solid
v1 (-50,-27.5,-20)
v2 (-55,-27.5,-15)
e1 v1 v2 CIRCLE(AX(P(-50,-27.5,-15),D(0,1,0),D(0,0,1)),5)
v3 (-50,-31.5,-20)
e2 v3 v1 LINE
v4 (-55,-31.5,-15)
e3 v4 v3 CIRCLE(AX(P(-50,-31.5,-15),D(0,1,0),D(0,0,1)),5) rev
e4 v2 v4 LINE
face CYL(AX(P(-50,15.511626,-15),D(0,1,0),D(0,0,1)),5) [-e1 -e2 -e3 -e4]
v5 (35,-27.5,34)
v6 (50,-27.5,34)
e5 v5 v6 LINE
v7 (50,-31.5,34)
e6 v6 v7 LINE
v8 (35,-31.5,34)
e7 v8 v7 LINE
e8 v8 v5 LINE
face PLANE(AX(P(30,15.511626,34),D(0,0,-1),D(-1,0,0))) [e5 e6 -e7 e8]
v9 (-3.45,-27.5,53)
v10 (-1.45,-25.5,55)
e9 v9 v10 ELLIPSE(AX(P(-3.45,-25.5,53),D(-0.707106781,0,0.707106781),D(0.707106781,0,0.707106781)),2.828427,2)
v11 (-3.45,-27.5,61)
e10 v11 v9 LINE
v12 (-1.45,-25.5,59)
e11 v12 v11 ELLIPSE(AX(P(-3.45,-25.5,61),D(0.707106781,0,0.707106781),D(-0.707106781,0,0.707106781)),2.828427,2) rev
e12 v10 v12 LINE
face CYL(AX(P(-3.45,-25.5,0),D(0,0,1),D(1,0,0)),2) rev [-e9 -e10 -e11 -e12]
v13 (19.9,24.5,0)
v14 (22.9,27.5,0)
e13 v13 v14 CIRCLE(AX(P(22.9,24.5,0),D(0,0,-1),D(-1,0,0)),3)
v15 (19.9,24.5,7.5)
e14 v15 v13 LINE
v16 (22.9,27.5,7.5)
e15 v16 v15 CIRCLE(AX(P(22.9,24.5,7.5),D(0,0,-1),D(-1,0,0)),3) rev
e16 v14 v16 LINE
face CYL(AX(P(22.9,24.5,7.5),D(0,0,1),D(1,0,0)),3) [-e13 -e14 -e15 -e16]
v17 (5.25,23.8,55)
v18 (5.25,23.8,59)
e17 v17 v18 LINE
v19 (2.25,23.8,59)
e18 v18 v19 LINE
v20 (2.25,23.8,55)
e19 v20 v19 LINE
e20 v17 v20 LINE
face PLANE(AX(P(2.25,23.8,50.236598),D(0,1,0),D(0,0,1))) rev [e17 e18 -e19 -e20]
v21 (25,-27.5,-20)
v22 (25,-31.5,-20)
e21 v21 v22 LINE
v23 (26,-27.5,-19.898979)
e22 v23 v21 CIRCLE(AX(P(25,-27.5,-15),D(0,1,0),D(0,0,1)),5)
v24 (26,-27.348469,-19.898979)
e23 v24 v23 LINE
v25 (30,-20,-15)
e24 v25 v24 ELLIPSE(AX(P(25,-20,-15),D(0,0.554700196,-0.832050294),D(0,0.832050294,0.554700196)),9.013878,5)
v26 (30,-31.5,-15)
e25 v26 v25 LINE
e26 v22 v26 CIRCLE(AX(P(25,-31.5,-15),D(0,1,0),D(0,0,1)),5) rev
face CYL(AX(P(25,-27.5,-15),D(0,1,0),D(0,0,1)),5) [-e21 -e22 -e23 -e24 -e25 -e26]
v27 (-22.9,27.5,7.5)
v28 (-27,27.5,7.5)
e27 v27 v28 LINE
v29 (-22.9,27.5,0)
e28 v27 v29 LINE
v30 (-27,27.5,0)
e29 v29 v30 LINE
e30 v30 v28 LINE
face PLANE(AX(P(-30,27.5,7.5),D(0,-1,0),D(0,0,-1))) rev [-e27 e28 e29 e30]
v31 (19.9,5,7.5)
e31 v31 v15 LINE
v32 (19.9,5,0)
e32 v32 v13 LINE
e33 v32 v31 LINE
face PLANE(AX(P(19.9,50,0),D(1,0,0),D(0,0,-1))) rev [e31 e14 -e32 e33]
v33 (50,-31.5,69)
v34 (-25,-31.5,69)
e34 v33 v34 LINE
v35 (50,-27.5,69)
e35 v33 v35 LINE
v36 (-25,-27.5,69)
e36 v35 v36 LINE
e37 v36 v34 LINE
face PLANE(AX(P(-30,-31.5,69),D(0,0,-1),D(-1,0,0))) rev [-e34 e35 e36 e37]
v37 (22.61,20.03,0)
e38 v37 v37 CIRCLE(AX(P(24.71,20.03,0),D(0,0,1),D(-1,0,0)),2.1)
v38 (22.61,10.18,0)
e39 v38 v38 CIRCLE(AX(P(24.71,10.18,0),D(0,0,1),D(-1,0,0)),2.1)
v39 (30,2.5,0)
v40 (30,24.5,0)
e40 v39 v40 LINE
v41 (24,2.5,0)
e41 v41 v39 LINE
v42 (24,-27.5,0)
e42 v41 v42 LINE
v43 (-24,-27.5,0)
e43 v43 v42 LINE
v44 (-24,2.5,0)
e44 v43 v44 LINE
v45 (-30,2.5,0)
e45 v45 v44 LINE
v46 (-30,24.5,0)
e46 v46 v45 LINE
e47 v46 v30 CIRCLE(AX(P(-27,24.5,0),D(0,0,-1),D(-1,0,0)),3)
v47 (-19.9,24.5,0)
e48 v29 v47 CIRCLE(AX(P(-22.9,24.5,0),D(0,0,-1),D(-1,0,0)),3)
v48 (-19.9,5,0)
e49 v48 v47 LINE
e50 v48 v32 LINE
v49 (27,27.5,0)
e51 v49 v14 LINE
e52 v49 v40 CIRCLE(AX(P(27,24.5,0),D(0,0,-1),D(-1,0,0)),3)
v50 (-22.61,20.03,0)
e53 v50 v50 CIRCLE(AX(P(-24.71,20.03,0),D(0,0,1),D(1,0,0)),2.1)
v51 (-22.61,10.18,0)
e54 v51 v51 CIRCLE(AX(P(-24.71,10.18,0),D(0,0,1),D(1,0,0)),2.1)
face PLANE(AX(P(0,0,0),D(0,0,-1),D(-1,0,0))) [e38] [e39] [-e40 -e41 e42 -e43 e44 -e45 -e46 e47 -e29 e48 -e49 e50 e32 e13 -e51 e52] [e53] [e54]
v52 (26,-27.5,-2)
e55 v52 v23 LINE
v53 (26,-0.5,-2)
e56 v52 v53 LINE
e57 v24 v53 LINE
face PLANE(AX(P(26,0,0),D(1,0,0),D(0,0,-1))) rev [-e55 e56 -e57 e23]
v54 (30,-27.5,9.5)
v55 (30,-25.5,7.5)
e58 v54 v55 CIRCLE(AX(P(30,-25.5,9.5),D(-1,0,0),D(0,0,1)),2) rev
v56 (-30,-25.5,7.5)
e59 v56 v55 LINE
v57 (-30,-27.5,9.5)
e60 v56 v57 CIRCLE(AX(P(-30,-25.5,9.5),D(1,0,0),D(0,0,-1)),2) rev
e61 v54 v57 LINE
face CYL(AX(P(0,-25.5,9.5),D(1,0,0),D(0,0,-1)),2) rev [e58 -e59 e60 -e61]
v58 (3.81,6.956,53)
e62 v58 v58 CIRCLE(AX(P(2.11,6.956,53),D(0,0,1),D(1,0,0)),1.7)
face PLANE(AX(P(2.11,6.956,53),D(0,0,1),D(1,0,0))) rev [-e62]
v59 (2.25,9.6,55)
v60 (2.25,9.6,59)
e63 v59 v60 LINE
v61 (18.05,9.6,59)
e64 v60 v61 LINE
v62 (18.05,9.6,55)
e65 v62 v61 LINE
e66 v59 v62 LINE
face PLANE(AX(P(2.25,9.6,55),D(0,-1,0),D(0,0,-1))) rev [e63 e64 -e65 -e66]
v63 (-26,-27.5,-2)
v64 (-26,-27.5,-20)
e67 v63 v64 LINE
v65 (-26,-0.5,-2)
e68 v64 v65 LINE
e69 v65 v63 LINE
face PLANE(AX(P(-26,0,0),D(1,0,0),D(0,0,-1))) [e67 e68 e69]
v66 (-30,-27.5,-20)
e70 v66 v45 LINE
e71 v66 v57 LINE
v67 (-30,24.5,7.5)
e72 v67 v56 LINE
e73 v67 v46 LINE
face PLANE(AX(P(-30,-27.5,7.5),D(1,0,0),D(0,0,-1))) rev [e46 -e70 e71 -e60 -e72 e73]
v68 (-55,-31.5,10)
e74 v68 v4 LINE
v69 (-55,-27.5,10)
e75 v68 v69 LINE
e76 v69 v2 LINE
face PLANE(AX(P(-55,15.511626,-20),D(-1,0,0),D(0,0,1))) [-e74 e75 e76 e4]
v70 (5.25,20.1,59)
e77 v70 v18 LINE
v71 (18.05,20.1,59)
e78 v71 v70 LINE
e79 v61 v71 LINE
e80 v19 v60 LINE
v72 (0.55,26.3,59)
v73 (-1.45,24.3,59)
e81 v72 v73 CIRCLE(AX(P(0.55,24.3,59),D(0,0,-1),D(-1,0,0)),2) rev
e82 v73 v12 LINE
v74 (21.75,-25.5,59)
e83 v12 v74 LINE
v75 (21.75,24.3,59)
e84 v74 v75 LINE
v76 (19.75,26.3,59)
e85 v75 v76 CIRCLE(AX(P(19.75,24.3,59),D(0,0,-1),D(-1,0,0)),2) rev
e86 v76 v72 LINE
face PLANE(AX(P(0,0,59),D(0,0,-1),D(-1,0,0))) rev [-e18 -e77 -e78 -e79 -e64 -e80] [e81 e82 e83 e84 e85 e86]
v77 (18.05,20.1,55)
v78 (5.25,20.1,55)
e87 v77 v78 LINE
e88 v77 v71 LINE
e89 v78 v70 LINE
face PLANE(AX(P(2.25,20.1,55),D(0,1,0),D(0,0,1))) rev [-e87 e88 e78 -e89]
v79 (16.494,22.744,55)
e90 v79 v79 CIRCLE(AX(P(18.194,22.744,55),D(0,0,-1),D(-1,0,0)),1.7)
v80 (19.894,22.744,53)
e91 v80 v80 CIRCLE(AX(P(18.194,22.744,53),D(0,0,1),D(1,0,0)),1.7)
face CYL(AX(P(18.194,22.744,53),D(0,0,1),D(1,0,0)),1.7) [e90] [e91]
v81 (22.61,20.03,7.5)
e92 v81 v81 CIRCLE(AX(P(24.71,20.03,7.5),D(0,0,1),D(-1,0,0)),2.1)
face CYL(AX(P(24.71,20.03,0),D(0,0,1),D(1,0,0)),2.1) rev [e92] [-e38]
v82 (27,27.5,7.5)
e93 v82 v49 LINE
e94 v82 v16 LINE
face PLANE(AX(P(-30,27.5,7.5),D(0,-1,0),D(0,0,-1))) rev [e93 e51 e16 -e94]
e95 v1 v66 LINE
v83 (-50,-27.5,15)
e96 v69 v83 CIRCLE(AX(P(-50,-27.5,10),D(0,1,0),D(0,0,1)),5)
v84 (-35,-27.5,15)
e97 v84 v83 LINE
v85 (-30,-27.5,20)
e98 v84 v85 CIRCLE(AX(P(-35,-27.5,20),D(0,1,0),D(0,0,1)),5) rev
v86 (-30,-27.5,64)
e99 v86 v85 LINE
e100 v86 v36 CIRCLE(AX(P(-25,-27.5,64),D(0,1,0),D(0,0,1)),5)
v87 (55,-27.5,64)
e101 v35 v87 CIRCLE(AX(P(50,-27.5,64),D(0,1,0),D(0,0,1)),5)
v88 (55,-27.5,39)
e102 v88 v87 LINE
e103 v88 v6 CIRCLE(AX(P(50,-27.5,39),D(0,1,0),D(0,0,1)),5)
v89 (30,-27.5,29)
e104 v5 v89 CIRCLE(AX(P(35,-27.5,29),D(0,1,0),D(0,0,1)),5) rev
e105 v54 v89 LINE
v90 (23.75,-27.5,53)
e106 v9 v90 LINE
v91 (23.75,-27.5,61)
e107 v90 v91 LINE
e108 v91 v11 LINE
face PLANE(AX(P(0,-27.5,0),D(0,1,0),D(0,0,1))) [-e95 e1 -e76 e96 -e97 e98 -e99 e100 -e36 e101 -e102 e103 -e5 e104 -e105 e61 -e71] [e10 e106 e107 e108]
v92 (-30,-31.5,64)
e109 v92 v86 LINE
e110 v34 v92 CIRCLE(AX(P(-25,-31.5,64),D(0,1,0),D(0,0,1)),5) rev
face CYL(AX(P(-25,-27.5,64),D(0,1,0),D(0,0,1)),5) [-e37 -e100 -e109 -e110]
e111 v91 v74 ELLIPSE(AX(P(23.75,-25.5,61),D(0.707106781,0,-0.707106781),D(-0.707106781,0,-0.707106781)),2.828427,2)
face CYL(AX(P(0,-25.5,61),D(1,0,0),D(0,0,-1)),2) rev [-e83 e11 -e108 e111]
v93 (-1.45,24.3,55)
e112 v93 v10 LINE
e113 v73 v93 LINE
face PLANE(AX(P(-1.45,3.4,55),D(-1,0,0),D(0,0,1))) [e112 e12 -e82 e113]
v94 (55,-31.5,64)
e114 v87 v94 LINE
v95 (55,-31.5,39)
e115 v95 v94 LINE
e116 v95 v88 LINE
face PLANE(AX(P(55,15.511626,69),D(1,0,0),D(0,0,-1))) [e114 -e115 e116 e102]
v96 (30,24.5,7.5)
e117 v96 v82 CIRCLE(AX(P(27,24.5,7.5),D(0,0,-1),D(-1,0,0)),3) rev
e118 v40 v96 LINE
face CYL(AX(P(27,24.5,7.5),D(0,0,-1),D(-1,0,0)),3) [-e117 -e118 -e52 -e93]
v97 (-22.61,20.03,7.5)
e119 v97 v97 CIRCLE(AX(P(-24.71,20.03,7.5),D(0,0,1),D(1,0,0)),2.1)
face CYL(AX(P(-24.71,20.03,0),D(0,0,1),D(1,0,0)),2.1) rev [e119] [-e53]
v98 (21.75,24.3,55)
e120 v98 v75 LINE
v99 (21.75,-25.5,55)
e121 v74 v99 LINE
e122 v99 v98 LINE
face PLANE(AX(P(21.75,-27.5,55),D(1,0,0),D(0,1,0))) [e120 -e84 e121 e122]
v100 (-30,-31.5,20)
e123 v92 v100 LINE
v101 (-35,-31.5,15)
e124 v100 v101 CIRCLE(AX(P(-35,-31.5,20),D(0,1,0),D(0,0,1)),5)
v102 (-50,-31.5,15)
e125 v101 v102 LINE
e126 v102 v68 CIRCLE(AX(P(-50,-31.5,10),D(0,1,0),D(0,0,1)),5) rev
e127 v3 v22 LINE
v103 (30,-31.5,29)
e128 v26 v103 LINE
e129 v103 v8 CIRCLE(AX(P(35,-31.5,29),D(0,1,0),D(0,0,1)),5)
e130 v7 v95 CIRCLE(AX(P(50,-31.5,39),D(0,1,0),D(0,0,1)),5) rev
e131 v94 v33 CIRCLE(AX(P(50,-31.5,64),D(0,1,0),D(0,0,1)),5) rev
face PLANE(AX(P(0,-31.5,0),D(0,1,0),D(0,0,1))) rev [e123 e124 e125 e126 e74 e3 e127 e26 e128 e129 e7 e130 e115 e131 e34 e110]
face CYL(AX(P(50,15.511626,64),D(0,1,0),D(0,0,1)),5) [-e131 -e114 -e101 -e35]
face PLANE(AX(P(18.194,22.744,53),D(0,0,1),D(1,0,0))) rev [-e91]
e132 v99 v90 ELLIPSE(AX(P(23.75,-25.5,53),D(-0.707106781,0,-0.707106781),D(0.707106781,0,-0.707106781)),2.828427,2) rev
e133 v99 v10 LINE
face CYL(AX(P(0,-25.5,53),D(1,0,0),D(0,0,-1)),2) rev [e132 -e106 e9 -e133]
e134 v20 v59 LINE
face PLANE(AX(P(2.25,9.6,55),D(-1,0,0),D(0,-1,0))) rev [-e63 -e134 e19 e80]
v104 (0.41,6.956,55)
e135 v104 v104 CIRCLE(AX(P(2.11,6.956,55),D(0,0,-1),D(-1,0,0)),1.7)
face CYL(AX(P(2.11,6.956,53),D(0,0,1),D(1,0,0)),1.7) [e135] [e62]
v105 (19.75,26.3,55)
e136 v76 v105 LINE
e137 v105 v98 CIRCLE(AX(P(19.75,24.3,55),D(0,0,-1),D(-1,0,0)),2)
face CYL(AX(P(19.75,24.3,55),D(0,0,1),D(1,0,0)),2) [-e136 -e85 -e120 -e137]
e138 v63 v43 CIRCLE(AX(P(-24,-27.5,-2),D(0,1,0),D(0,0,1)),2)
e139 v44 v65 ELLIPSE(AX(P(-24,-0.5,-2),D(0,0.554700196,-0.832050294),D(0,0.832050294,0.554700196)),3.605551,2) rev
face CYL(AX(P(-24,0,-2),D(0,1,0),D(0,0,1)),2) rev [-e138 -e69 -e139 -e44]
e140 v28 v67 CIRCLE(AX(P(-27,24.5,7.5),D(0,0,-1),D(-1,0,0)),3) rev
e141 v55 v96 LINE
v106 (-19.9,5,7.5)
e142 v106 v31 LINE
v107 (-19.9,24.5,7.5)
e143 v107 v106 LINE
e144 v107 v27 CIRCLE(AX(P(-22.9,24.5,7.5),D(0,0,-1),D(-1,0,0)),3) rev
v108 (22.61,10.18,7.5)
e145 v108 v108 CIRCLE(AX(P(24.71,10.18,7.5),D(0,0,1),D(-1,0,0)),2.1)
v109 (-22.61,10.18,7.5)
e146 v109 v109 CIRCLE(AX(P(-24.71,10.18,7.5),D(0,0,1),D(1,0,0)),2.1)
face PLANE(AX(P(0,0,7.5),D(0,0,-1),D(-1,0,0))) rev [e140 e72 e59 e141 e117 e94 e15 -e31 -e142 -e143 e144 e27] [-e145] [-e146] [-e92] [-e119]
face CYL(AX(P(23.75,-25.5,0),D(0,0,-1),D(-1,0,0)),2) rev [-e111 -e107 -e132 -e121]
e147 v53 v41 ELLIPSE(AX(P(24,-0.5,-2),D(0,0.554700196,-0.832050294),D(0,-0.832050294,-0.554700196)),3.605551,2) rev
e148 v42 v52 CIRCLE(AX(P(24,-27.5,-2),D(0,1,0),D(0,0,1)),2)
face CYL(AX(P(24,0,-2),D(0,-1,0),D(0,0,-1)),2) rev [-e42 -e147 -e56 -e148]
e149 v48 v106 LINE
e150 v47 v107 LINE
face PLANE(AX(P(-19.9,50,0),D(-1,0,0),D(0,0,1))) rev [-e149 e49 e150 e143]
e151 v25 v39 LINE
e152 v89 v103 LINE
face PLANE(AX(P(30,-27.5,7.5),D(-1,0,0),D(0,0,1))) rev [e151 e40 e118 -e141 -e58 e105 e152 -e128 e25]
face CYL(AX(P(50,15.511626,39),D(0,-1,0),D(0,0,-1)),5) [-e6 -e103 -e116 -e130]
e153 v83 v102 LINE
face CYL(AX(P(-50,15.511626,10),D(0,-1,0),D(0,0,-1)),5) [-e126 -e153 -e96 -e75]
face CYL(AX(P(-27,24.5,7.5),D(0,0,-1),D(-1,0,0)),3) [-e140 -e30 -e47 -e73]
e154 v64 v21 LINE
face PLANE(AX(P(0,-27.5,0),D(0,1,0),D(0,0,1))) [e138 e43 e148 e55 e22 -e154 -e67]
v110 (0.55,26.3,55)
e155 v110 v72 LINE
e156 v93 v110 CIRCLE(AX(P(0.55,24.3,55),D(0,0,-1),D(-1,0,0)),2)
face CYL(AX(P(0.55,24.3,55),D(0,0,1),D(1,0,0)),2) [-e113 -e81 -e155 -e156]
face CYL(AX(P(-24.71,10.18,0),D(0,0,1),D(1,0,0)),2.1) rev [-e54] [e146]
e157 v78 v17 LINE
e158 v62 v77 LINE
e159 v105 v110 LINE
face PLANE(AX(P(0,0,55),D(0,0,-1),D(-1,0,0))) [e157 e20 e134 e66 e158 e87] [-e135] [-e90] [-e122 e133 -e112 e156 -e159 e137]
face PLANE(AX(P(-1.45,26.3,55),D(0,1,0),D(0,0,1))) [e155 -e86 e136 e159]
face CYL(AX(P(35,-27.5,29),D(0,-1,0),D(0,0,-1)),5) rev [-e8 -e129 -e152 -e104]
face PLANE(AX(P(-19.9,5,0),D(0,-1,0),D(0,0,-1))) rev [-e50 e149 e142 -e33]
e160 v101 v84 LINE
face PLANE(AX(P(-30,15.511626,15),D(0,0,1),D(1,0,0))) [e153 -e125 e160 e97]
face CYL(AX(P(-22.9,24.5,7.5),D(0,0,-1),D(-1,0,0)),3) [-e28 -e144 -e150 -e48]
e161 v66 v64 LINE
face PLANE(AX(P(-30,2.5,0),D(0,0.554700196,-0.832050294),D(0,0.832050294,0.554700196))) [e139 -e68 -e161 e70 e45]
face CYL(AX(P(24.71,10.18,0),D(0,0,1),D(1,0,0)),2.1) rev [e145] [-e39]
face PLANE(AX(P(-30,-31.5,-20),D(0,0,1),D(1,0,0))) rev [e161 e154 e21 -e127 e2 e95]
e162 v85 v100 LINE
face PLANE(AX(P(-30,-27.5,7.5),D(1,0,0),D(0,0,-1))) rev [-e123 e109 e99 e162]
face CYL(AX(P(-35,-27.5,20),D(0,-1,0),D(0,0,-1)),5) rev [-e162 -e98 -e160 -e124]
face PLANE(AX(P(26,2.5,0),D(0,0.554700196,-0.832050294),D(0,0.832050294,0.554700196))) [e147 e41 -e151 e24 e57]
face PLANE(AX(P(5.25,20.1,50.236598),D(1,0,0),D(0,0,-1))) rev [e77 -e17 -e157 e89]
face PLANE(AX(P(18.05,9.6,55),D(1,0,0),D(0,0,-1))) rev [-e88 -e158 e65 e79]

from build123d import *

# Parameters (mm, degrees)
SKETCH2_W                = 60
SKETCH2_H                = 55
BOSS_EXTRUDE1_DEPTH      = 7.5
SKETCH3_W                = 39.8
SKETCH3_H                = 45
CUT_EXTRUDE1_DEPTH       = 42.382363393
SKETCH4_R                = 2.1
CUT_EXTRUDE2_DEPTH       = 42.382363393
BOSS_EXTRUDE2_DEPTH      = 3
BOSS_EXTRUDE2_DEPTH_BACK = 1
SKETCH6_R                = 1.7
SKETCH6_W                = 15.8
SKETCH6_H                = 10.5
SKETCH7_W                = 3
SKETCH7_H                = 3.7
CUT_EXTRUDE3_DEPTH       = 4
SKETCH8_R                = 1.7
BOSS_EXTRUDE4_DEPTH      = 6
SKETCH10_W               = 60
SKETCH10_H               = 89
BOSS_EXTRUDE5_DEPTH      = 4
BOSS_EXTRUDE6_DEPTH      = 4
LPATTERN1_COUNT          = 2
LPATTERN1_PITCH          = 56
FILLET1_R                = 3
FILLET3_R                = 2
FILLET4_R                = 2
FILLET5_R                = 2
FILLET6_R                = 2
FILLET7_R                = 2
FILLET8_R                = 2
FILLET9_R                = 2
FILLET10_R               = 2
SKETCH12_W               = 25
SKETCH12_H               = 35
BOSS_EXTRUDE7_DEPTH      = 4
FILLET11_R               = 5


with BuildPart() as part:
    # Sketch2 → Boss-Extrude1 (new body)
    with BuildSketch(Plane.XY):
        Rectangle(SKETCH2_W, SKETCH2_H)
    extrude(amount=BOSS_EXTRUDE1_DEPTH)

    # Sketch3 → Cut-Extrude1 (cut, through all)
    with BuildSketch(Plane.XY.offset(7.5)):
        with Locations((0, 27.5)):
            Rectangle(SKETCH3_W, SKETCH3_H)
    extrude(amount=-CUT_EXTRUDE1_DEPTH, mode=Mode.SUBTRACT)

    # Sketch4 → Cut-Extrude2 (cut, through all)
    with BuildSketch(Plane.XY.offset(7.5)):
        with Locations((-24.71, 20.03)):
            Circle(SKETCH4_R)
        with Locations((-24.71, 10.18)):
            Circle(SKETCH4_R)
        with Locations(Location((24.71, 20.03, 0), (0, 0, 180))):
            Circle(SKETCH4_R)
        with Locations(Location((24.71, 10.18, 0), (0, 0, 180))):
            Circle(SKETCH4_R)
    extrude(amount=-CUT_EXTRUDE2_DEPTH, mode=Mode.SUBTRACT)



with BuildPart() as body_2:
    # Sketch6 → Boss-Extrude2 (new, two sides: drawn at the far end of the back side and taken through both)
    with BuildSketch(Plane.XY.offset(56).offset(-BOSS_EXTRUDE2_DEPTH_BACK)):
        Polygon((-1.45, 3.4), (-1.45, 26.3), (21.75, 26.3), (21.75, 3.4), (21.75, -27.5), (-1.45, -27.5), align=None)
        with Locations((18.194, 22.744)):
            Circle(SKETCH6_R, mode=Mode.SUBTRACT)
        with Locations((2.11, 6.956)):
            Circle(SKETCH6_R, mode=Mode.SUBTRACT)
        with Locations((10.15, 14.85)):
            Rectangle(SKETCH6_W, SKETCH6_H, mode=Mode.SUBTRACT)
    extrude(amount=BOSS_EXTRUDE2_DEPTH + BOSS_EXTRUDE2_DEPTH_BACK)

    # Sketch7 → Cut-Extrude3 (cut)
    with BuildSketch(Plane.XY.offset(59)):
        with Locations((3.75, 21.95)):
            Rectangle(SKETCH7_W, SKETCH7_H)
    extrude(amount=-CUT_EXTRUDE3_DEPTH, mode=Mode.SUBTRACT)

    # Sketch8 → Boss-Extrude4 (add)
    with BuildSketch(Plane.XY.offset(59)):
        with Locations((18.194, 22.744)):
            Circle(SKETCH8_R)
        with Locations((2.11, 6.956)):
            Circle(SKETCH8_R)
    extrude(amount=-BOSS_EXTRUDE4_DEPTH)


with BuildPart() as part_1:
    add(part.part)

    add(body_2.part)  # Boss-Extrude5 merges body 2
    # Sketch10 → Boss-Extrude5 (add)
    with BuildSketch(Plane.XZ.offset(27.5)):
        with Locations((0, 24.5)):
            Rectangle(SKETCH10_W, SKETCH10_H)
    extrude(amount=BOSS_EXTRUDE5_DEPTH)

    # Sketch11 → Boss-Extrude6 (add)
    with BuildSketch(Plane(origin=(30, 0, 0), x_dir=(0, 0, -1), z_dir=(1, 0, 0))):
        Polygon((0, 2.5), (20, -27.5), (0, -27.5), align=None)
    boss_extrude6 = extrude(amount=-BOSS_EXTRUDE6_DEPTH)

    # LPattern1: Boss-Extrude6 ×2
    with Locations(*[(-i * LPATTERN1_PITCH, 0, 0) for i in range(1, LPATTERN1_COUNT)]):
        add(boss_extrude6)

    # Fillet1
    fillet1_edges = [part_1.edges().sort_by_distance(p)[0] for p in [
        (19.9, 27.5, 3.75),
        (-19.9, 27.5, 3.75),
        (-30, 27.5, 3.75),
        (30, 27.5, 3.75),
    ]]
    fillet(fillet1_edges, radius=FILLET1_R)

    # Fillet3
    fillet3_edges = [part_1.edges().sort_by_distance(p)[0] for p in [
        (21.75, 26.3, 57),
        (-1.45, 26.3, 57),
    ]]
    fillet(fillet3_edges, radius=FILLET3_R)

    # Fillet4
    fillet4_edges = [part_1.edges().sort_by_distance(p)[0] for p in [
        (-1.45, -27.5, 57),
    ]]
    fillet(fillet4_edges, radius=FILLET4_R)

    # Fillet5
    fillet5_edges = [part_1.edges().sort_by_distance(p)[0] for p in [
        (21.75, -27.5, 57),
    ]]
    fillet(fillet5_edges, radius=FILLET5_R)

    # Fillet6
    fillet6_edges = [part_1.edges().sort_by_distance(p)[0] for p in [
        (0, -27.5, 7.5),
    ]]
    fillet(fillet6_edges, radius=FILLET6_R)

    # Fillet7
    fillet7_edges = [part_1.edges().sort_by_distance(p)[0] for p in [
        (10.15, -27.5, 55),
    ]]
    fillet(fillet7_edges, radius=FILLET7_R)

    # Fillet8
    fillet8_edges = [part_1.edges().sort_by_distance(p)[0] for p in [
        (10.15, -27.5, 59),
    ]]
    fillet(fillet8_edges, radius=FILLET8_R)

    # Fillet9
    fillet9_edges = [part_1.edges().sort_by_distance(p)[0] for p in [
        (26, -12.5, 0),
    ]]
    fillet(fillet9_edges, radius=FILLET9_R)

    # Fillet10
    fillet10_edges = [part_1.edges().sort_by_distance(p)[0] for p in [
        (-26, -12.5, 0),
    ]]
    fillet(fillet10_edges, radius=FILLET10_R)

    # Sketch12 → Boss-Extrude7 (add)
    with BuildSketch(Plane.XZ.offset(31.5)):
        with Locations((-42.5, -2.5)):
            Rectangle(SKETCH12_W, SKETCH12_H)
        with Locations((42.5, 51.5)):
            Rectangle(SKETCH12_W, SKETCH12_H)
    extrude(amount=-BOSS_EXTRUDE7_DEPTH)

    # Fillet11
    # the kernel refuses this fillet: 5 mm, written as the material it adds along each edge
    with BuildSketch(Plane(origin=(-30, -31.5, 15), x_dir=(-1, 0, 0), z_dir=(0, 1, 0)), Plane(origin=(30, -31.5, 34), x_dir=(1, 0, 0), z_dir=(0, 1, 0))) as fillet11_piece_1:
        with BuildLine():
            CenterArc((FILLET11_R, FILLET11_R), FILLET11_R, 180, 90)
            Line((0, FILLET11_R), (0, 0))
            Line((0, 0), (FILLET11_R, 0))
        make_face()
    extrude(amount=4)
    # the kernel refuses this fillet: 5 mm, written as the material it takes off along each edge
    with BuildSketch(Plane(origin=(-55, -44, 15), x_dir=(0, 0, -1), z_dir=(0, 1, 0)), Plane(origin=(-55, -44, -20), x_dir=(1, 0, 0), z_dir=(0, 1, 0)), Plane(origin=(30, -15, -20), x_dir=(-1, 0, 0), z_dir=(0, -1, 0))) as fillet11_2_piece_1:
        with BuildLine():
            CenterArc((FILLET11_R, -FILLET11_R), FILLET11_R, 90, 90)
            Line((0, -FILLET11_R), (0, 0))
            Line((0, 0), (FILLET11_R, 0))
        make_face()
    extrude(amount=29, mode=Mode.SUBTRACT)
    with BuildSketch(Plane(origin=(55, -44, 34), x_dir=(-1, 0, 0), z_dir=(0, 1, 0)), Plane(origin=(55, -44, 69), x_dir=(0, 0, -1), z_dir=(0, 1, 0)), Plane(origin=(-30, -15, 69), x_dir=(0, 0, -1), z_dir=(0, -1, 0))) as fillet11_2_piece_2:
        with BuildLine():
            CenterArc((FILLET11_R, FILLET11_R), FILLET11_R, 180, 90)
            Line((0, FILLET11_R), (0, 0))
            Line((0, 0), (FILLET11_R, 0))
        make_face()
    extrude(amount=29, mode=Mode.SUBTRACT)


solid = part_1.part
